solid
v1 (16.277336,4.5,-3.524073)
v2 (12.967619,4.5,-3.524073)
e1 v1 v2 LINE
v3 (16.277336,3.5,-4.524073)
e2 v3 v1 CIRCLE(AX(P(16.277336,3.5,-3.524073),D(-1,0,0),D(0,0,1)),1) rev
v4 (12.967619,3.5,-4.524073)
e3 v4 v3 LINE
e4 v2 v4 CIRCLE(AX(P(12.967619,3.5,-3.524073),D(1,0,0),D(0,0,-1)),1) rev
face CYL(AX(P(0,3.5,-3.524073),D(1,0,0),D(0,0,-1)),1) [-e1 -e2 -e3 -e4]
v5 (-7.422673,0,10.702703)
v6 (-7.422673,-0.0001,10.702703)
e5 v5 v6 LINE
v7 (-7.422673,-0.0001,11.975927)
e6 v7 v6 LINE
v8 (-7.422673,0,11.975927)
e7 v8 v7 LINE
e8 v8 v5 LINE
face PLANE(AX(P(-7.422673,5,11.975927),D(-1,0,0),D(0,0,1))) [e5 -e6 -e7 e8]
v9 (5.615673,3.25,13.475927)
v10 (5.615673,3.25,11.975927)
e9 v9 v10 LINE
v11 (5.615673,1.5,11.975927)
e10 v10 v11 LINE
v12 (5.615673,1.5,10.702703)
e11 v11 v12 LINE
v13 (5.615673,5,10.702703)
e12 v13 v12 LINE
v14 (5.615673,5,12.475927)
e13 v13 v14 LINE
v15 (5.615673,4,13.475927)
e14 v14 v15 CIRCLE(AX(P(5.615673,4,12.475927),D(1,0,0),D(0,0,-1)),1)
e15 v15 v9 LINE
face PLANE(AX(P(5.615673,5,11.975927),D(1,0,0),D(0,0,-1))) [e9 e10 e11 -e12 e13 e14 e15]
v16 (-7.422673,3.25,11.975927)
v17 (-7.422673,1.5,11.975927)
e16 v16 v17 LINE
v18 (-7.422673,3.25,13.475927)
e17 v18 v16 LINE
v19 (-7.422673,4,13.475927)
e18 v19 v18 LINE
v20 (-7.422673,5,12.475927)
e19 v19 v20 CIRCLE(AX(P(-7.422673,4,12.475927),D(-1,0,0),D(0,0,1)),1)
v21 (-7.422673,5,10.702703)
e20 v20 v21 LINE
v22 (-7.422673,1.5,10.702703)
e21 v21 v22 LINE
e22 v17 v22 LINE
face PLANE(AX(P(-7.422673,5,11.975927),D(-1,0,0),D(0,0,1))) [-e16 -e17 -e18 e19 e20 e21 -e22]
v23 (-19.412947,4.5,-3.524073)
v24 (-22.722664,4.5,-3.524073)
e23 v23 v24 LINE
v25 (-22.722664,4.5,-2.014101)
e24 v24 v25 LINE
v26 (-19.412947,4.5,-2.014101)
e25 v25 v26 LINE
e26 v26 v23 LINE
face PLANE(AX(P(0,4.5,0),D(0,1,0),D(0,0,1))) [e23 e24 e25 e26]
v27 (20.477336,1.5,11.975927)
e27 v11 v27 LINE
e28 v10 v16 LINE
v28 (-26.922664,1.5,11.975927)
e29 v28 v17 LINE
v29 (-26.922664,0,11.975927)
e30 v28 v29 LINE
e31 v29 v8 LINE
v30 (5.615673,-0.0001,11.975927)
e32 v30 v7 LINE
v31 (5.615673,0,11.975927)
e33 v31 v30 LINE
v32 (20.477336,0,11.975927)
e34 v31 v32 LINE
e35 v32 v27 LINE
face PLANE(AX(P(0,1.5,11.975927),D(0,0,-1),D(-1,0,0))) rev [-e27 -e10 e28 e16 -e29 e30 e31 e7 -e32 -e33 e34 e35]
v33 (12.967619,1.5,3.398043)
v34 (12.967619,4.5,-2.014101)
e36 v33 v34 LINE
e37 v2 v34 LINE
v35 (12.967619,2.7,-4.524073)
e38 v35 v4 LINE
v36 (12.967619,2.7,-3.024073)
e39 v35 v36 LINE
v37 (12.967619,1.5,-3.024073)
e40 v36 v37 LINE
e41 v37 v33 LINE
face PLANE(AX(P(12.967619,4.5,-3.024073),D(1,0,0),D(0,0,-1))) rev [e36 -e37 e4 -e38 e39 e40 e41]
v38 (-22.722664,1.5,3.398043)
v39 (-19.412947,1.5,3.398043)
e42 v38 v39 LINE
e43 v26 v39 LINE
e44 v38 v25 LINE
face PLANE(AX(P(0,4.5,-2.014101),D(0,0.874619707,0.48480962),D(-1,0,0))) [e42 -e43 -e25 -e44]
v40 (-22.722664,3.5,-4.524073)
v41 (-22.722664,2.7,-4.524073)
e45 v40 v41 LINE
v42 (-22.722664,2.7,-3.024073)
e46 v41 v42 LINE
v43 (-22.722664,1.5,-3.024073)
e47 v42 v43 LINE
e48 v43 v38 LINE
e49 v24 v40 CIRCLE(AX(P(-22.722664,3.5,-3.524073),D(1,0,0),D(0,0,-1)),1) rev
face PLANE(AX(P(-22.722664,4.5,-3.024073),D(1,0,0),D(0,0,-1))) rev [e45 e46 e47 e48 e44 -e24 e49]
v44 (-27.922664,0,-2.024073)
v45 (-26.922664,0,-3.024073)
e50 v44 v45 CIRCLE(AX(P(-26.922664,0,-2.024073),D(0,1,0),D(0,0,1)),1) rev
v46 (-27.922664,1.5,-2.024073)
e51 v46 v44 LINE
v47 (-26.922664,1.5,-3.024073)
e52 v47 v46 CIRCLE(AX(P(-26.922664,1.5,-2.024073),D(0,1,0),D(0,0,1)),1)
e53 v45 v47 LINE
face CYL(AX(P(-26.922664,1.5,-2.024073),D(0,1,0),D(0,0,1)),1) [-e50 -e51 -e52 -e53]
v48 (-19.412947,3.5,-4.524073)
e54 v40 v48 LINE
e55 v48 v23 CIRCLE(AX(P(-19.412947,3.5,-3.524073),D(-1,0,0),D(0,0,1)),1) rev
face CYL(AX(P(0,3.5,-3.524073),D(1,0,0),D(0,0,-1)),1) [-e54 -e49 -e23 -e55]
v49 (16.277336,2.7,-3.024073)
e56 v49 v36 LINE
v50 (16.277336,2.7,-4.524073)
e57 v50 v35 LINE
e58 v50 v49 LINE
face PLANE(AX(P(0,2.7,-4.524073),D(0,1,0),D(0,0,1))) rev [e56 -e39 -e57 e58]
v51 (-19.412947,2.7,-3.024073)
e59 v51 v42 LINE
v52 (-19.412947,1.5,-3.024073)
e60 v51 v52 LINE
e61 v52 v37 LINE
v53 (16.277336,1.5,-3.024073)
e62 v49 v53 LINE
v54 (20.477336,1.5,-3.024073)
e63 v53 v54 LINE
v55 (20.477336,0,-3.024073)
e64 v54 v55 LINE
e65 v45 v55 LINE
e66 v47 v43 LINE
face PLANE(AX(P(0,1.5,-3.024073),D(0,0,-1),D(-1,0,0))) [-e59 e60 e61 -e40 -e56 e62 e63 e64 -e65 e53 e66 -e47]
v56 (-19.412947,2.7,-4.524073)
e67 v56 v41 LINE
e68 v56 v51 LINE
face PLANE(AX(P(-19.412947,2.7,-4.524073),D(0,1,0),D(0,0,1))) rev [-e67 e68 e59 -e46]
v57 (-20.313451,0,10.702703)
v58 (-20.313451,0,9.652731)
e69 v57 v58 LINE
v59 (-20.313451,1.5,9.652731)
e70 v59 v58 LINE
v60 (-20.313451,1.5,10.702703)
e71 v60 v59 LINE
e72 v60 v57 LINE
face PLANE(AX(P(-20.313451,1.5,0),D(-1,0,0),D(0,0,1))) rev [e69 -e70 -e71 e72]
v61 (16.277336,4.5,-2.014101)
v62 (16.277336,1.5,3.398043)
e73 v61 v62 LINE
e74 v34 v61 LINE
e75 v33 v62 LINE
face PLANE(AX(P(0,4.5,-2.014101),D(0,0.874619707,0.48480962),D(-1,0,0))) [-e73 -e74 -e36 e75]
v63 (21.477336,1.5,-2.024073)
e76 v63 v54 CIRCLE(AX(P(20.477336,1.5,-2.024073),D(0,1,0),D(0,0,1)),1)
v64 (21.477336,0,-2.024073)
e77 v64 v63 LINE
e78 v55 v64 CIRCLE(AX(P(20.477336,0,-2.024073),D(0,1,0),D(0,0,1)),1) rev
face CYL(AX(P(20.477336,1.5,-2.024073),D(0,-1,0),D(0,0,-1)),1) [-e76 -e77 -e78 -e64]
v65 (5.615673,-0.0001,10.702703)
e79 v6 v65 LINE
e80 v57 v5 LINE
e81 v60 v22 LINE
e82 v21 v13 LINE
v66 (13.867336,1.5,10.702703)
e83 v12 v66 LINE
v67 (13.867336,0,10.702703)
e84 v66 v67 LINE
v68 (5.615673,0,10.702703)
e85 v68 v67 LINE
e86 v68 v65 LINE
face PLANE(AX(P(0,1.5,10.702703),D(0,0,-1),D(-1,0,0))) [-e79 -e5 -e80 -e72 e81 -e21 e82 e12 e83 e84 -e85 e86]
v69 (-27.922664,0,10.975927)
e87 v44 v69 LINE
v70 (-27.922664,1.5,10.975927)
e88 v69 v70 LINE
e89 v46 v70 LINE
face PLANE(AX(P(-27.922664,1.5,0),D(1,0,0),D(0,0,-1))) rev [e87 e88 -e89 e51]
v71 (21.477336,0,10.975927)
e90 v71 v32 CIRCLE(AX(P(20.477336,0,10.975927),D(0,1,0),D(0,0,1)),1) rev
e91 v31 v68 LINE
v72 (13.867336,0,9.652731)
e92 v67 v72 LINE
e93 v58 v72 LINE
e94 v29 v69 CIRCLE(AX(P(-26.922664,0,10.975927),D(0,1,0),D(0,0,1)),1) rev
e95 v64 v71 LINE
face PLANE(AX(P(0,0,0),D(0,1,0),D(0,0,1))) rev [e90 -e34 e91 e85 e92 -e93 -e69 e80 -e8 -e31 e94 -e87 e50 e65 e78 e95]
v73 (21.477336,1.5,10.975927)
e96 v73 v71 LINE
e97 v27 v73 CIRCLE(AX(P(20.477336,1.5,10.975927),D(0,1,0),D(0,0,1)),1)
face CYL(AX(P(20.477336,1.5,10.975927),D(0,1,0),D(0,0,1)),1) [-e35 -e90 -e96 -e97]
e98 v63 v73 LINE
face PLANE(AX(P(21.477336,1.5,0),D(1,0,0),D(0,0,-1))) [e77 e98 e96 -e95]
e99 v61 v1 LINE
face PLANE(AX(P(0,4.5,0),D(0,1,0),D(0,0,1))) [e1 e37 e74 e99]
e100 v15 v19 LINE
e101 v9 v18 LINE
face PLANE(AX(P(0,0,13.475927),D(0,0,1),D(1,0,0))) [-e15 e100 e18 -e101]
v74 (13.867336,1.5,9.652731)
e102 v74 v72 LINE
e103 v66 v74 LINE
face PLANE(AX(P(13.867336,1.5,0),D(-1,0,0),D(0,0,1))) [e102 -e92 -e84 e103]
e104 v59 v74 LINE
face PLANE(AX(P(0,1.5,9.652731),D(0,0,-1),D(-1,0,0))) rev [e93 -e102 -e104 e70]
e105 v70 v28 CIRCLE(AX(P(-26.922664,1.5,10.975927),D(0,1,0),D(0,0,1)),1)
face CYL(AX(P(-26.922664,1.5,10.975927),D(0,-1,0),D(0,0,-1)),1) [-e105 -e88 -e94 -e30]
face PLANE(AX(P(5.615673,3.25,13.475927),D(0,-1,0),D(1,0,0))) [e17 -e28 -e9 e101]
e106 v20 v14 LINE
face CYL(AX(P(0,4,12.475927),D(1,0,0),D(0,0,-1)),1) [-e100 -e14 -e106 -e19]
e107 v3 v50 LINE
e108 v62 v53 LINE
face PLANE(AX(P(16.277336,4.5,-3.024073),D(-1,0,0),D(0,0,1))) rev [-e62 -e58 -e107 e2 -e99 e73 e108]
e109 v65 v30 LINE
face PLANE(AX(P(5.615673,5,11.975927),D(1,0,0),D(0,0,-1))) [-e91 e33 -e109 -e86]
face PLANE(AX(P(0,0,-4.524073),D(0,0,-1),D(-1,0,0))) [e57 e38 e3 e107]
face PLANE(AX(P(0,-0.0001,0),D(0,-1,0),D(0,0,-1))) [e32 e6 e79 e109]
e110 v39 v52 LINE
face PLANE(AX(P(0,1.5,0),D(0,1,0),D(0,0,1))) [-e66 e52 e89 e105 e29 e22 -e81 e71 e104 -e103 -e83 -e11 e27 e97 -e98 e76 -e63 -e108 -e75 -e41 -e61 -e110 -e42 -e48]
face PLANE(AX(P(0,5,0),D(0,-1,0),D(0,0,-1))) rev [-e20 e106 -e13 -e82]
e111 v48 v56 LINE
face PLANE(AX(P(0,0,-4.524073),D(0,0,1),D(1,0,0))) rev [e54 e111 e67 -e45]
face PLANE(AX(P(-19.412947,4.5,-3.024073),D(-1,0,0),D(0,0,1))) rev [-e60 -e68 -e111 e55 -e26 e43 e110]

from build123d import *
from OCP.BRepFilletAPI import BRepFilletAPI_MakeChamfer

# Parameters (mm, degrees)
SKETCH1_W                 = 5
SKETCH1_H                 = 1.629773482
SKETCH1_H_2               = 1.605700765
BOSS_EXTRUDE21_DEPTH      = 1.5
BOSS_EXTRUDE22_DEPTH      = 0.0001
BOSS_EXTRUDE22_DEPTH_BACK = 5
SKETCH4_W                 = 13.038345926
SKETCH4_H                 = 1.27322458
SKETCH5_W                 = 13.038345926
SKETCH5_H                 = 1.75
BOSS_EXTRUDE23_DEPTH      = 1.5
SKETCH6_W                 = 3.309716912
SKETCH6_H                 = 6.42211522
SKETCH6_W_2               = 3.309716913
BOSS_EXTRUDE24_DEPTH      = 3
SKETCH8_W                 = 3.309716912
SKETCH8_H                 = 1.8
SKETCH8_W_2               = 3.309716913
BOSS_EXTRUDE26_DEPTH      = 1.5
FILLET1_R                 = 1
FILLET2_R                 = 1
CHAMFER1_SIZE             = 3
CHAMFER1_SIZE_2           = 5.412143266


with BuildPart() as part:
    # Sketch1 → Boss-Extrude21 (new body)
    # profile 1 of 3: a face of its own
    with BuildSketch(Plane(origin=(0, 0, 0), x_dir=(1, 0, 0), z_dir=(0, 1, 0))):
        with Locations((9.977336143, 2.209185976)):
            Rectangle(SKETCH1_W, SKETCH1_H)
    # profile 2 of 3: a face of its own
    with BuildSketch(Plane(origin=(0, 0, 0), x_dir=(1, 0, 0), z_dir=(0, 1, 0))):
        Polygon((-7.422672964, -10.702702703), (-20.313450574, -10.702702703), (-20.313450574, -9.652730884), (13.867336143, -9.652730884), (13.867336143, -10.702702703), (0.977336143, -10.702702703), (0.977336143, -11.975927283), (21.477336143, -11.975927283), (21.477336143, 3.024072717), (12.477336143, 3.024072717), (12.477336143, 1.394299235), (7.477336143, 1.394299235), (7.477336143, 3.024072717), (-27.922663857, 3.024072717), (-27.922663857, -11.975927283), (-7.422672964, -11.975927283), align=None)
        with Locations((-16.422663857, 2.186483824)):
            Rectangle(SKETCH1_W, SKETCH1_H_2, mode=Mode.SUBTRACT)
    # profile 3 of 3: a face of its own
    with BuildSketch(Plane(origin=(0, 0, 0), x_dir=(1, 0, 0), z_dir=(0, 1, 0))):
        with Locations((-16.422663857, 2.186483824)):
            Rectangle(SKETCH1_W, SKETCH1_H_2)
    extrude(amount=BOSS_EXTRUDE21_DEPTH)

    # Sketch4 → Boss-Extrude22 (add, two sides: drawn at the far end of the back side and taken through both)
    with BuildSketch(Plane.XZ.offset(-BOSS_EXTRUDE22_DEPTH_BACK)):
        with Locations((-0.903500001, 11.339314993)):
            Rectangle(SKETCH4_W, SKETCH4_H)
    extrude(amount=BOSS_EXTRUDE22_DEPTH + BOSS_EXTRUDE22_DEPTH_BACK)

    # Sketch5 → Boss-Extrude23 (add)
    with BuildSketch(Plane.XY.offset(11.975927283)):
        with Locations((-0.903500001, 4.125)):
            Rectangle(SKETCH5_W, SKETCH5_H)
    extrude(amount=BOSS_EXTRUDE23_DEPTH)

    # Sketch6 → Boss-Extrude24 (add)
    with BuildSketch(Plane(origin=(0, 1.5, 0), x_dir=(1, 0, 0), z_dir=(0, 1, 0))):
        with Locations((14.622477687, -0.186984893)):
            Rectangle(SKETCH6_W, SKETCH6_H)
        with Locations((-21.0678054, -0.186984893)):
            Rectangle(SKETCH6_W_2, SKETCH6_H)
    extrude(amount=BOSS_EXTRUDE24_DEPTH)

    # Sketch8 → Boss-Extrude26 (add)
    with BuildSketch(Plane(origin=(0, 0, -3.024072717), x_dir=(-1, 0, 0), z_dir=(0, 0, -1))):
        with Locations((-14.622477687, 3.6)):
            Rectangle(SKETCH8_W, SKETCH8_H)
        with Locations((21.0678054, 3.6)):
            Rectangle(SKETCH8_W_2, SKETCH8_H)
    extrude(amount=BOSS_EXTRUDE26_DEPTH)

    # Fillet1
    fillet1_edges = [part.edges().sort_by_distance(p)[0] for p in [
        (14.622477687, 4.5, -4.524072717),
        (-21.0678054, 4.5, -4.524072717),
        (-0.903500001, 5, 13.475927283),
    ]]
    fillet(fillet1_edges, radius=FILLET1_R)

    # Fillet2
    fillet2_edges = [part.edges().sort_by_distance(p)[0] for p in [
        (21.477336143, 0.75, 11.975927283),
        (-27.922663857, 0.75, 11.975927283),
        (-27.922663857, 0.75, -3.024072717),
        (21.477336143, 0.75, -3.024072717),
    ]]
    fillet(fillet2_edges, radius=FILLET2_R)

    # Chamfer1
    chamfer1_edges_1 = [part.edges().sort_by_distance(p)[0] for p in [
        (14.622477687, 4.5, 3.398042503),
    ]]
    chamfer1_side_1 = [part.faces().sort_by_distance(p)[0] for p in [
        (14.622477687, 4.44, 3.398042503),
    ]]
    chamfer1_edges_2 = [part.edges().sort_by_distance(p)[0] for p in [
        (-21.0678054, 4.5, 3.398042503),
    ]]
    chamfer1_side_2 = [part.faces().sort_by_distance(p)[0] for p in [
        (-21.0678054, 4.44, 3.398042503),
    ]]
    chamfer1 = BRepFilletAPI_MakeChamfer(part.part.solid().wrapped)
    for e in chamfer1_edges_1:
        chamfer1.Add(CHAMFER1_SIZE - 0.0001, CHAMFER1_SIZE_2 - 0.0001, e.wrapped, chamfer1_side_1[0].wrapped)
    for e in chamfer1_edges_2:
        chamfer1.Add(CHAMFER1_SIZE - 0.0001, CHAMFER1_SIZE_2 - 0.0001, e.wrapped, chamfer1_side_2[0].wrapped)
    add(Compound.cast(chamfer1.Shape()), mode=Mode.REPLACE)  # a hair under: the kernel refuses the full size


solid = part.part
